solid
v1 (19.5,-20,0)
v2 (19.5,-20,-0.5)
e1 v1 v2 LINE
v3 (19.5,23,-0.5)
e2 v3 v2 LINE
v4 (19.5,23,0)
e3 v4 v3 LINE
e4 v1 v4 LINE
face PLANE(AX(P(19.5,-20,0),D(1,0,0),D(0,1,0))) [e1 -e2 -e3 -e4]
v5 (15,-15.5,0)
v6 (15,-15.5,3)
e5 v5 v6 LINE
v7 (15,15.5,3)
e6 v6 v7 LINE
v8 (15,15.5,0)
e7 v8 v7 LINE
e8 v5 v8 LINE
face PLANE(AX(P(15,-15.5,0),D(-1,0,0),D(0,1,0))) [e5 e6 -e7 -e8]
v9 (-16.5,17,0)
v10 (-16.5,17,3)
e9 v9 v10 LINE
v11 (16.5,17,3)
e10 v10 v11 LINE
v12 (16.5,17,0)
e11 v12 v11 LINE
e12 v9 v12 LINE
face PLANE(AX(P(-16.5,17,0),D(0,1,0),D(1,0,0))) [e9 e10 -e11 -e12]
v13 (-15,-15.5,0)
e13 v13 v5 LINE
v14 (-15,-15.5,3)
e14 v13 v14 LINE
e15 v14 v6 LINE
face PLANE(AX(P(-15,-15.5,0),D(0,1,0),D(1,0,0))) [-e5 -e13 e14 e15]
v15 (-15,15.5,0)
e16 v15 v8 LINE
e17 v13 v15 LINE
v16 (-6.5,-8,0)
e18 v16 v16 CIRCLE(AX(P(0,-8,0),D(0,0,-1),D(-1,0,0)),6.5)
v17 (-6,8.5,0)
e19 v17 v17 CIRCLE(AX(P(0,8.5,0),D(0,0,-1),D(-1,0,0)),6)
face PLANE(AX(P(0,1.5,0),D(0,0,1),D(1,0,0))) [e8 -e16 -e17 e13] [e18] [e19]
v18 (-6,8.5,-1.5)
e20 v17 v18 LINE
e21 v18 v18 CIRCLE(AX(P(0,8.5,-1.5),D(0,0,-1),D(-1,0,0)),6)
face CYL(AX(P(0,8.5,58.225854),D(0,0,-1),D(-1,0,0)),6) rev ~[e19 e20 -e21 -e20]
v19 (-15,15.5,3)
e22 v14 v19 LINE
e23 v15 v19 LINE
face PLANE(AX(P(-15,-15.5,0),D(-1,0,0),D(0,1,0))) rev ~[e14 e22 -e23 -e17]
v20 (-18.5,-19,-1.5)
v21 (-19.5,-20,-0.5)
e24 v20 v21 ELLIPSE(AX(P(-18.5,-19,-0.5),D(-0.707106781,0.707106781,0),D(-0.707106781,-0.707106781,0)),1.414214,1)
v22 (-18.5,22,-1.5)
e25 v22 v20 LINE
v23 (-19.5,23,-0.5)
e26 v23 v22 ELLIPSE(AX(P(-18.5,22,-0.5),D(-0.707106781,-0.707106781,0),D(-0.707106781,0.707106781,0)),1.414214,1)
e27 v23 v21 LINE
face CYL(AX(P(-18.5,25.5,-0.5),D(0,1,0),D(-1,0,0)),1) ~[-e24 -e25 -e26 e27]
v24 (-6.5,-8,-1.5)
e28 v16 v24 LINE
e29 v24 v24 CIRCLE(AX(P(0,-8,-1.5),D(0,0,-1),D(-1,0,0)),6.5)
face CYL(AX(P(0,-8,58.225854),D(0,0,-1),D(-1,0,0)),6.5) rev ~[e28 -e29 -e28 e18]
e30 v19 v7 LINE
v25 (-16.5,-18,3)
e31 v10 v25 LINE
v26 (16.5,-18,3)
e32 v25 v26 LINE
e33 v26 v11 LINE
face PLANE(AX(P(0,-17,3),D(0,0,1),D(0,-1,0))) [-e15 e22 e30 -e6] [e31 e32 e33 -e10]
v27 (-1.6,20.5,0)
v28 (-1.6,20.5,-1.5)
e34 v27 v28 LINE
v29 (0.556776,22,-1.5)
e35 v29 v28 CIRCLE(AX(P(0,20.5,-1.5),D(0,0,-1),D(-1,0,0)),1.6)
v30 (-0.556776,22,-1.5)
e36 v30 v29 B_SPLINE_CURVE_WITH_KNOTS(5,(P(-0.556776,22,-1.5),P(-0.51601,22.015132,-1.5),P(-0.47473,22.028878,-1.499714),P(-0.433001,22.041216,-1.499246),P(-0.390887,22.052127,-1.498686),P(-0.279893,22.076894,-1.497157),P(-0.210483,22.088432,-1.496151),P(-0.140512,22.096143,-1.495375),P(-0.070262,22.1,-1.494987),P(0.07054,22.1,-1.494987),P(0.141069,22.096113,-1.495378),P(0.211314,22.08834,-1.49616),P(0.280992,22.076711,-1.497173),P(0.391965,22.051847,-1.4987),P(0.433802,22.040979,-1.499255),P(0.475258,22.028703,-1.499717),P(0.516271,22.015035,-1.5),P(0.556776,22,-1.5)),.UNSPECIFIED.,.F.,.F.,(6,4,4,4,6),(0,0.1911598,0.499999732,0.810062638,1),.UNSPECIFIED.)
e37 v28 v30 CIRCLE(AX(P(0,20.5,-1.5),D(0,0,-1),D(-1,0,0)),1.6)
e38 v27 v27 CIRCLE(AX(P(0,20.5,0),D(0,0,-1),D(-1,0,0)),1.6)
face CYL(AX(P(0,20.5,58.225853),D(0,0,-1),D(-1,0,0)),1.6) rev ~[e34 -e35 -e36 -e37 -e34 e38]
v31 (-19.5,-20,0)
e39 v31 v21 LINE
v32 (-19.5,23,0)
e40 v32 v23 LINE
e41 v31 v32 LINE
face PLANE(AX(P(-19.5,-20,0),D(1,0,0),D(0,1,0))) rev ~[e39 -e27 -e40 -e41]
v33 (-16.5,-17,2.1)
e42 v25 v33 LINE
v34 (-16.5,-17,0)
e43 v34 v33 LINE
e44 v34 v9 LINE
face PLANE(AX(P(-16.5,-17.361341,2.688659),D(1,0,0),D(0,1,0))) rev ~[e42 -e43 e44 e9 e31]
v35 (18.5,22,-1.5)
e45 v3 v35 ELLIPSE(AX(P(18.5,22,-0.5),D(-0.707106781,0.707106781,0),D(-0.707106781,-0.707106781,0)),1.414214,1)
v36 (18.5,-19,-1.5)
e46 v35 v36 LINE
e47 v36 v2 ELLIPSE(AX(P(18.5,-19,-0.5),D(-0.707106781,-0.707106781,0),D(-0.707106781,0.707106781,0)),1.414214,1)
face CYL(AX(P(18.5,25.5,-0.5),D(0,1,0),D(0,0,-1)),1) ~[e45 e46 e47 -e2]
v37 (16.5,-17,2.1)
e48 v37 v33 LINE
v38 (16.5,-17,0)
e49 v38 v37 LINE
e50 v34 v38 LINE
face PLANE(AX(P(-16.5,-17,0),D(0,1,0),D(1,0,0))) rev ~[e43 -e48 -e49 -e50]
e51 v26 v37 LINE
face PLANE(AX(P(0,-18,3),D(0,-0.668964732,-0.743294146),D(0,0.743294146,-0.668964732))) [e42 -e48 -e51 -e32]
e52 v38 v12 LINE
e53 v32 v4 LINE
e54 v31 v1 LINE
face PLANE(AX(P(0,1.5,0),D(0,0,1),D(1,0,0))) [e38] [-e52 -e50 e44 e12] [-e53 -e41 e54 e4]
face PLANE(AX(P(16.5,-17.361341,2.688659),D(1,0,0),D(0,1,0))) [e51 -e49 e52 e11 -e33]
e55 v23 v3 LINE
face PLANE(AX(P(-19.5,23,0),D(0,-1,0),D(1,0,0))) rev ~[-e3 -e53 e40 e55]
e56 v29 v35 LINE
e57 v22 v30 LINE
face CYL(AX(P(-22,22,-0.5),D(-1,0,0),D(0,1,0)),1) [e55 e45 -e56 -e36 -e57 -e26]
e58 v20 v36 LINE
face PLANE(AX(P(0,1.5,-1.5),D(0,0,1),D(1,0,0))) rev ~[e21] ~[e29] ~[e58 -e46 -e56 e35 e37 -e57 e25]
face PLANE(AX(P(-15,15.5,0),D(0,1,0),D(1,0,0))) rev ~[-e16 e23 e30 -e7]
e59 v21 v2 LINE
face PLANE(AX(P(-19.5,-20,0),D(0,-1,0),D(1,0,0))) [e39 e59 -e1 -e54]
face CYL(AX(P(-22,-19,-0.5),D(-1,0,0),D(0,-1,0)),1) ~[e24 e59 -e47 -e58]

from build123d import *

# Parameters (mm, degrees)
F0_W        = 33
F0_H        = 34
F0_W_2      = 30
F0_H_2      = 31
F1_DEPTH    = 3
F2_W        = 39
F2_H        = 43
F3_DEPTH    = 1.5
F4_D        = 3.2
F5_T1_DEPTH = 44
F5_T3_DEPTH = 48
F7_DEPTH    = 16.5
F8_D        = 12
F9_D        = 13


# Not quite as in the source:
# - a fillet or chamfer that OpenCascade refuses, or shapes differently, is made with other operations: its cross-section is extruded or revolved along the edge and cut away or added


with BuildPart() as f1:
    # F0 (on Top) → F1 (new body)
    with BuildSketch(Plane.XY):
        Rectangle(F0_W, F0_H)
        Rectangle(F0_W_2, F0_H_2, mode=Mode.SUBTRACT)
    extrude(amount=F1_DEPTH)

    # F2 (on Top) → F3 (join)
    with BuildSketch(Plane.XY):
        with Locations((0, 1.5)):
            Rectangle(F2_W, F2_H)
    extrude(amount=-F3_DEPTH)

    # F4 (through all)
    with Locations(Plane.XY):
        with Locations((0, 20.5)):
            Hole(F4_D / 2)

    # F5: fillet of radius 1 on 4 edges, made by hand

    # F5_s2 → F5_t1 (cut)
    with BuildSketch(Plane.YZ.offset(-22)):
        with BuildLine():
            ThreePointArc((23, -0.5), (22.7071067812, -1.2071067812), (22, -1.5))
            Line((22, -1.5), (23, -1.5))
            Line((23, -1.5), (23, -0.5))
        make_face()
        with BuildLine():
            ThreePointArc((-20, -0.5), (-19.7071067812, -1.2071067812), (-19, -1.5))
            Line((-19, -1.5), (-20, -1.5))
            Line((-20, -1.5), (-20, -0.5))
        make_face()
    extrude(amount=F5_T1_DEPTH, mode=Mode.SUBTRACT)

    # F5_s4 → F5_t3 (cut)
    with BuildSketch(Plane.XZ.offset(-25.5)):
        with BuildLine():
            ThreePointArc((-19.5, -0.5), (-19.2071067812, -1.2071067812), (-18.5, -1.5))
            Line((-18.5, -1.5), (-19.5, -1.5))
            Line((-19.5, -1.5), (-19.5, -0.5))
        make_face()
        with BuildLine():
            ThreePointArc((18.5, -1.5), (19.2071067812, -1.2071067812), (19.5, -0.5))
            Line((19.5, -0.5), (19.5, -1.5))
            Line((19.5, -1.5), (18.5, -1.5))
        make_face()
    extrude(amount=F5_T3_DEPTH, mode=Mode.SUBTRACT)

    # F6 (on Right) → F7 (join, symmetric)
    with BuildSketch(Plane.YZ):
        Polygon((-17, 3), (-18, 3), (-17, 2.1), align=None)
    extrude(amount=F7_DEPTH, both=True)

    # F8 (through all)
    with Locations(Plane.XY):
        with Locations((0, 8.5)):
            Hole(F8_D / 2)

    # F9 (through all)
    with Locations(Plane.XY):
        with Locations((0, -8)):
            Hole(F9_D / 2)


solid = f1.part
